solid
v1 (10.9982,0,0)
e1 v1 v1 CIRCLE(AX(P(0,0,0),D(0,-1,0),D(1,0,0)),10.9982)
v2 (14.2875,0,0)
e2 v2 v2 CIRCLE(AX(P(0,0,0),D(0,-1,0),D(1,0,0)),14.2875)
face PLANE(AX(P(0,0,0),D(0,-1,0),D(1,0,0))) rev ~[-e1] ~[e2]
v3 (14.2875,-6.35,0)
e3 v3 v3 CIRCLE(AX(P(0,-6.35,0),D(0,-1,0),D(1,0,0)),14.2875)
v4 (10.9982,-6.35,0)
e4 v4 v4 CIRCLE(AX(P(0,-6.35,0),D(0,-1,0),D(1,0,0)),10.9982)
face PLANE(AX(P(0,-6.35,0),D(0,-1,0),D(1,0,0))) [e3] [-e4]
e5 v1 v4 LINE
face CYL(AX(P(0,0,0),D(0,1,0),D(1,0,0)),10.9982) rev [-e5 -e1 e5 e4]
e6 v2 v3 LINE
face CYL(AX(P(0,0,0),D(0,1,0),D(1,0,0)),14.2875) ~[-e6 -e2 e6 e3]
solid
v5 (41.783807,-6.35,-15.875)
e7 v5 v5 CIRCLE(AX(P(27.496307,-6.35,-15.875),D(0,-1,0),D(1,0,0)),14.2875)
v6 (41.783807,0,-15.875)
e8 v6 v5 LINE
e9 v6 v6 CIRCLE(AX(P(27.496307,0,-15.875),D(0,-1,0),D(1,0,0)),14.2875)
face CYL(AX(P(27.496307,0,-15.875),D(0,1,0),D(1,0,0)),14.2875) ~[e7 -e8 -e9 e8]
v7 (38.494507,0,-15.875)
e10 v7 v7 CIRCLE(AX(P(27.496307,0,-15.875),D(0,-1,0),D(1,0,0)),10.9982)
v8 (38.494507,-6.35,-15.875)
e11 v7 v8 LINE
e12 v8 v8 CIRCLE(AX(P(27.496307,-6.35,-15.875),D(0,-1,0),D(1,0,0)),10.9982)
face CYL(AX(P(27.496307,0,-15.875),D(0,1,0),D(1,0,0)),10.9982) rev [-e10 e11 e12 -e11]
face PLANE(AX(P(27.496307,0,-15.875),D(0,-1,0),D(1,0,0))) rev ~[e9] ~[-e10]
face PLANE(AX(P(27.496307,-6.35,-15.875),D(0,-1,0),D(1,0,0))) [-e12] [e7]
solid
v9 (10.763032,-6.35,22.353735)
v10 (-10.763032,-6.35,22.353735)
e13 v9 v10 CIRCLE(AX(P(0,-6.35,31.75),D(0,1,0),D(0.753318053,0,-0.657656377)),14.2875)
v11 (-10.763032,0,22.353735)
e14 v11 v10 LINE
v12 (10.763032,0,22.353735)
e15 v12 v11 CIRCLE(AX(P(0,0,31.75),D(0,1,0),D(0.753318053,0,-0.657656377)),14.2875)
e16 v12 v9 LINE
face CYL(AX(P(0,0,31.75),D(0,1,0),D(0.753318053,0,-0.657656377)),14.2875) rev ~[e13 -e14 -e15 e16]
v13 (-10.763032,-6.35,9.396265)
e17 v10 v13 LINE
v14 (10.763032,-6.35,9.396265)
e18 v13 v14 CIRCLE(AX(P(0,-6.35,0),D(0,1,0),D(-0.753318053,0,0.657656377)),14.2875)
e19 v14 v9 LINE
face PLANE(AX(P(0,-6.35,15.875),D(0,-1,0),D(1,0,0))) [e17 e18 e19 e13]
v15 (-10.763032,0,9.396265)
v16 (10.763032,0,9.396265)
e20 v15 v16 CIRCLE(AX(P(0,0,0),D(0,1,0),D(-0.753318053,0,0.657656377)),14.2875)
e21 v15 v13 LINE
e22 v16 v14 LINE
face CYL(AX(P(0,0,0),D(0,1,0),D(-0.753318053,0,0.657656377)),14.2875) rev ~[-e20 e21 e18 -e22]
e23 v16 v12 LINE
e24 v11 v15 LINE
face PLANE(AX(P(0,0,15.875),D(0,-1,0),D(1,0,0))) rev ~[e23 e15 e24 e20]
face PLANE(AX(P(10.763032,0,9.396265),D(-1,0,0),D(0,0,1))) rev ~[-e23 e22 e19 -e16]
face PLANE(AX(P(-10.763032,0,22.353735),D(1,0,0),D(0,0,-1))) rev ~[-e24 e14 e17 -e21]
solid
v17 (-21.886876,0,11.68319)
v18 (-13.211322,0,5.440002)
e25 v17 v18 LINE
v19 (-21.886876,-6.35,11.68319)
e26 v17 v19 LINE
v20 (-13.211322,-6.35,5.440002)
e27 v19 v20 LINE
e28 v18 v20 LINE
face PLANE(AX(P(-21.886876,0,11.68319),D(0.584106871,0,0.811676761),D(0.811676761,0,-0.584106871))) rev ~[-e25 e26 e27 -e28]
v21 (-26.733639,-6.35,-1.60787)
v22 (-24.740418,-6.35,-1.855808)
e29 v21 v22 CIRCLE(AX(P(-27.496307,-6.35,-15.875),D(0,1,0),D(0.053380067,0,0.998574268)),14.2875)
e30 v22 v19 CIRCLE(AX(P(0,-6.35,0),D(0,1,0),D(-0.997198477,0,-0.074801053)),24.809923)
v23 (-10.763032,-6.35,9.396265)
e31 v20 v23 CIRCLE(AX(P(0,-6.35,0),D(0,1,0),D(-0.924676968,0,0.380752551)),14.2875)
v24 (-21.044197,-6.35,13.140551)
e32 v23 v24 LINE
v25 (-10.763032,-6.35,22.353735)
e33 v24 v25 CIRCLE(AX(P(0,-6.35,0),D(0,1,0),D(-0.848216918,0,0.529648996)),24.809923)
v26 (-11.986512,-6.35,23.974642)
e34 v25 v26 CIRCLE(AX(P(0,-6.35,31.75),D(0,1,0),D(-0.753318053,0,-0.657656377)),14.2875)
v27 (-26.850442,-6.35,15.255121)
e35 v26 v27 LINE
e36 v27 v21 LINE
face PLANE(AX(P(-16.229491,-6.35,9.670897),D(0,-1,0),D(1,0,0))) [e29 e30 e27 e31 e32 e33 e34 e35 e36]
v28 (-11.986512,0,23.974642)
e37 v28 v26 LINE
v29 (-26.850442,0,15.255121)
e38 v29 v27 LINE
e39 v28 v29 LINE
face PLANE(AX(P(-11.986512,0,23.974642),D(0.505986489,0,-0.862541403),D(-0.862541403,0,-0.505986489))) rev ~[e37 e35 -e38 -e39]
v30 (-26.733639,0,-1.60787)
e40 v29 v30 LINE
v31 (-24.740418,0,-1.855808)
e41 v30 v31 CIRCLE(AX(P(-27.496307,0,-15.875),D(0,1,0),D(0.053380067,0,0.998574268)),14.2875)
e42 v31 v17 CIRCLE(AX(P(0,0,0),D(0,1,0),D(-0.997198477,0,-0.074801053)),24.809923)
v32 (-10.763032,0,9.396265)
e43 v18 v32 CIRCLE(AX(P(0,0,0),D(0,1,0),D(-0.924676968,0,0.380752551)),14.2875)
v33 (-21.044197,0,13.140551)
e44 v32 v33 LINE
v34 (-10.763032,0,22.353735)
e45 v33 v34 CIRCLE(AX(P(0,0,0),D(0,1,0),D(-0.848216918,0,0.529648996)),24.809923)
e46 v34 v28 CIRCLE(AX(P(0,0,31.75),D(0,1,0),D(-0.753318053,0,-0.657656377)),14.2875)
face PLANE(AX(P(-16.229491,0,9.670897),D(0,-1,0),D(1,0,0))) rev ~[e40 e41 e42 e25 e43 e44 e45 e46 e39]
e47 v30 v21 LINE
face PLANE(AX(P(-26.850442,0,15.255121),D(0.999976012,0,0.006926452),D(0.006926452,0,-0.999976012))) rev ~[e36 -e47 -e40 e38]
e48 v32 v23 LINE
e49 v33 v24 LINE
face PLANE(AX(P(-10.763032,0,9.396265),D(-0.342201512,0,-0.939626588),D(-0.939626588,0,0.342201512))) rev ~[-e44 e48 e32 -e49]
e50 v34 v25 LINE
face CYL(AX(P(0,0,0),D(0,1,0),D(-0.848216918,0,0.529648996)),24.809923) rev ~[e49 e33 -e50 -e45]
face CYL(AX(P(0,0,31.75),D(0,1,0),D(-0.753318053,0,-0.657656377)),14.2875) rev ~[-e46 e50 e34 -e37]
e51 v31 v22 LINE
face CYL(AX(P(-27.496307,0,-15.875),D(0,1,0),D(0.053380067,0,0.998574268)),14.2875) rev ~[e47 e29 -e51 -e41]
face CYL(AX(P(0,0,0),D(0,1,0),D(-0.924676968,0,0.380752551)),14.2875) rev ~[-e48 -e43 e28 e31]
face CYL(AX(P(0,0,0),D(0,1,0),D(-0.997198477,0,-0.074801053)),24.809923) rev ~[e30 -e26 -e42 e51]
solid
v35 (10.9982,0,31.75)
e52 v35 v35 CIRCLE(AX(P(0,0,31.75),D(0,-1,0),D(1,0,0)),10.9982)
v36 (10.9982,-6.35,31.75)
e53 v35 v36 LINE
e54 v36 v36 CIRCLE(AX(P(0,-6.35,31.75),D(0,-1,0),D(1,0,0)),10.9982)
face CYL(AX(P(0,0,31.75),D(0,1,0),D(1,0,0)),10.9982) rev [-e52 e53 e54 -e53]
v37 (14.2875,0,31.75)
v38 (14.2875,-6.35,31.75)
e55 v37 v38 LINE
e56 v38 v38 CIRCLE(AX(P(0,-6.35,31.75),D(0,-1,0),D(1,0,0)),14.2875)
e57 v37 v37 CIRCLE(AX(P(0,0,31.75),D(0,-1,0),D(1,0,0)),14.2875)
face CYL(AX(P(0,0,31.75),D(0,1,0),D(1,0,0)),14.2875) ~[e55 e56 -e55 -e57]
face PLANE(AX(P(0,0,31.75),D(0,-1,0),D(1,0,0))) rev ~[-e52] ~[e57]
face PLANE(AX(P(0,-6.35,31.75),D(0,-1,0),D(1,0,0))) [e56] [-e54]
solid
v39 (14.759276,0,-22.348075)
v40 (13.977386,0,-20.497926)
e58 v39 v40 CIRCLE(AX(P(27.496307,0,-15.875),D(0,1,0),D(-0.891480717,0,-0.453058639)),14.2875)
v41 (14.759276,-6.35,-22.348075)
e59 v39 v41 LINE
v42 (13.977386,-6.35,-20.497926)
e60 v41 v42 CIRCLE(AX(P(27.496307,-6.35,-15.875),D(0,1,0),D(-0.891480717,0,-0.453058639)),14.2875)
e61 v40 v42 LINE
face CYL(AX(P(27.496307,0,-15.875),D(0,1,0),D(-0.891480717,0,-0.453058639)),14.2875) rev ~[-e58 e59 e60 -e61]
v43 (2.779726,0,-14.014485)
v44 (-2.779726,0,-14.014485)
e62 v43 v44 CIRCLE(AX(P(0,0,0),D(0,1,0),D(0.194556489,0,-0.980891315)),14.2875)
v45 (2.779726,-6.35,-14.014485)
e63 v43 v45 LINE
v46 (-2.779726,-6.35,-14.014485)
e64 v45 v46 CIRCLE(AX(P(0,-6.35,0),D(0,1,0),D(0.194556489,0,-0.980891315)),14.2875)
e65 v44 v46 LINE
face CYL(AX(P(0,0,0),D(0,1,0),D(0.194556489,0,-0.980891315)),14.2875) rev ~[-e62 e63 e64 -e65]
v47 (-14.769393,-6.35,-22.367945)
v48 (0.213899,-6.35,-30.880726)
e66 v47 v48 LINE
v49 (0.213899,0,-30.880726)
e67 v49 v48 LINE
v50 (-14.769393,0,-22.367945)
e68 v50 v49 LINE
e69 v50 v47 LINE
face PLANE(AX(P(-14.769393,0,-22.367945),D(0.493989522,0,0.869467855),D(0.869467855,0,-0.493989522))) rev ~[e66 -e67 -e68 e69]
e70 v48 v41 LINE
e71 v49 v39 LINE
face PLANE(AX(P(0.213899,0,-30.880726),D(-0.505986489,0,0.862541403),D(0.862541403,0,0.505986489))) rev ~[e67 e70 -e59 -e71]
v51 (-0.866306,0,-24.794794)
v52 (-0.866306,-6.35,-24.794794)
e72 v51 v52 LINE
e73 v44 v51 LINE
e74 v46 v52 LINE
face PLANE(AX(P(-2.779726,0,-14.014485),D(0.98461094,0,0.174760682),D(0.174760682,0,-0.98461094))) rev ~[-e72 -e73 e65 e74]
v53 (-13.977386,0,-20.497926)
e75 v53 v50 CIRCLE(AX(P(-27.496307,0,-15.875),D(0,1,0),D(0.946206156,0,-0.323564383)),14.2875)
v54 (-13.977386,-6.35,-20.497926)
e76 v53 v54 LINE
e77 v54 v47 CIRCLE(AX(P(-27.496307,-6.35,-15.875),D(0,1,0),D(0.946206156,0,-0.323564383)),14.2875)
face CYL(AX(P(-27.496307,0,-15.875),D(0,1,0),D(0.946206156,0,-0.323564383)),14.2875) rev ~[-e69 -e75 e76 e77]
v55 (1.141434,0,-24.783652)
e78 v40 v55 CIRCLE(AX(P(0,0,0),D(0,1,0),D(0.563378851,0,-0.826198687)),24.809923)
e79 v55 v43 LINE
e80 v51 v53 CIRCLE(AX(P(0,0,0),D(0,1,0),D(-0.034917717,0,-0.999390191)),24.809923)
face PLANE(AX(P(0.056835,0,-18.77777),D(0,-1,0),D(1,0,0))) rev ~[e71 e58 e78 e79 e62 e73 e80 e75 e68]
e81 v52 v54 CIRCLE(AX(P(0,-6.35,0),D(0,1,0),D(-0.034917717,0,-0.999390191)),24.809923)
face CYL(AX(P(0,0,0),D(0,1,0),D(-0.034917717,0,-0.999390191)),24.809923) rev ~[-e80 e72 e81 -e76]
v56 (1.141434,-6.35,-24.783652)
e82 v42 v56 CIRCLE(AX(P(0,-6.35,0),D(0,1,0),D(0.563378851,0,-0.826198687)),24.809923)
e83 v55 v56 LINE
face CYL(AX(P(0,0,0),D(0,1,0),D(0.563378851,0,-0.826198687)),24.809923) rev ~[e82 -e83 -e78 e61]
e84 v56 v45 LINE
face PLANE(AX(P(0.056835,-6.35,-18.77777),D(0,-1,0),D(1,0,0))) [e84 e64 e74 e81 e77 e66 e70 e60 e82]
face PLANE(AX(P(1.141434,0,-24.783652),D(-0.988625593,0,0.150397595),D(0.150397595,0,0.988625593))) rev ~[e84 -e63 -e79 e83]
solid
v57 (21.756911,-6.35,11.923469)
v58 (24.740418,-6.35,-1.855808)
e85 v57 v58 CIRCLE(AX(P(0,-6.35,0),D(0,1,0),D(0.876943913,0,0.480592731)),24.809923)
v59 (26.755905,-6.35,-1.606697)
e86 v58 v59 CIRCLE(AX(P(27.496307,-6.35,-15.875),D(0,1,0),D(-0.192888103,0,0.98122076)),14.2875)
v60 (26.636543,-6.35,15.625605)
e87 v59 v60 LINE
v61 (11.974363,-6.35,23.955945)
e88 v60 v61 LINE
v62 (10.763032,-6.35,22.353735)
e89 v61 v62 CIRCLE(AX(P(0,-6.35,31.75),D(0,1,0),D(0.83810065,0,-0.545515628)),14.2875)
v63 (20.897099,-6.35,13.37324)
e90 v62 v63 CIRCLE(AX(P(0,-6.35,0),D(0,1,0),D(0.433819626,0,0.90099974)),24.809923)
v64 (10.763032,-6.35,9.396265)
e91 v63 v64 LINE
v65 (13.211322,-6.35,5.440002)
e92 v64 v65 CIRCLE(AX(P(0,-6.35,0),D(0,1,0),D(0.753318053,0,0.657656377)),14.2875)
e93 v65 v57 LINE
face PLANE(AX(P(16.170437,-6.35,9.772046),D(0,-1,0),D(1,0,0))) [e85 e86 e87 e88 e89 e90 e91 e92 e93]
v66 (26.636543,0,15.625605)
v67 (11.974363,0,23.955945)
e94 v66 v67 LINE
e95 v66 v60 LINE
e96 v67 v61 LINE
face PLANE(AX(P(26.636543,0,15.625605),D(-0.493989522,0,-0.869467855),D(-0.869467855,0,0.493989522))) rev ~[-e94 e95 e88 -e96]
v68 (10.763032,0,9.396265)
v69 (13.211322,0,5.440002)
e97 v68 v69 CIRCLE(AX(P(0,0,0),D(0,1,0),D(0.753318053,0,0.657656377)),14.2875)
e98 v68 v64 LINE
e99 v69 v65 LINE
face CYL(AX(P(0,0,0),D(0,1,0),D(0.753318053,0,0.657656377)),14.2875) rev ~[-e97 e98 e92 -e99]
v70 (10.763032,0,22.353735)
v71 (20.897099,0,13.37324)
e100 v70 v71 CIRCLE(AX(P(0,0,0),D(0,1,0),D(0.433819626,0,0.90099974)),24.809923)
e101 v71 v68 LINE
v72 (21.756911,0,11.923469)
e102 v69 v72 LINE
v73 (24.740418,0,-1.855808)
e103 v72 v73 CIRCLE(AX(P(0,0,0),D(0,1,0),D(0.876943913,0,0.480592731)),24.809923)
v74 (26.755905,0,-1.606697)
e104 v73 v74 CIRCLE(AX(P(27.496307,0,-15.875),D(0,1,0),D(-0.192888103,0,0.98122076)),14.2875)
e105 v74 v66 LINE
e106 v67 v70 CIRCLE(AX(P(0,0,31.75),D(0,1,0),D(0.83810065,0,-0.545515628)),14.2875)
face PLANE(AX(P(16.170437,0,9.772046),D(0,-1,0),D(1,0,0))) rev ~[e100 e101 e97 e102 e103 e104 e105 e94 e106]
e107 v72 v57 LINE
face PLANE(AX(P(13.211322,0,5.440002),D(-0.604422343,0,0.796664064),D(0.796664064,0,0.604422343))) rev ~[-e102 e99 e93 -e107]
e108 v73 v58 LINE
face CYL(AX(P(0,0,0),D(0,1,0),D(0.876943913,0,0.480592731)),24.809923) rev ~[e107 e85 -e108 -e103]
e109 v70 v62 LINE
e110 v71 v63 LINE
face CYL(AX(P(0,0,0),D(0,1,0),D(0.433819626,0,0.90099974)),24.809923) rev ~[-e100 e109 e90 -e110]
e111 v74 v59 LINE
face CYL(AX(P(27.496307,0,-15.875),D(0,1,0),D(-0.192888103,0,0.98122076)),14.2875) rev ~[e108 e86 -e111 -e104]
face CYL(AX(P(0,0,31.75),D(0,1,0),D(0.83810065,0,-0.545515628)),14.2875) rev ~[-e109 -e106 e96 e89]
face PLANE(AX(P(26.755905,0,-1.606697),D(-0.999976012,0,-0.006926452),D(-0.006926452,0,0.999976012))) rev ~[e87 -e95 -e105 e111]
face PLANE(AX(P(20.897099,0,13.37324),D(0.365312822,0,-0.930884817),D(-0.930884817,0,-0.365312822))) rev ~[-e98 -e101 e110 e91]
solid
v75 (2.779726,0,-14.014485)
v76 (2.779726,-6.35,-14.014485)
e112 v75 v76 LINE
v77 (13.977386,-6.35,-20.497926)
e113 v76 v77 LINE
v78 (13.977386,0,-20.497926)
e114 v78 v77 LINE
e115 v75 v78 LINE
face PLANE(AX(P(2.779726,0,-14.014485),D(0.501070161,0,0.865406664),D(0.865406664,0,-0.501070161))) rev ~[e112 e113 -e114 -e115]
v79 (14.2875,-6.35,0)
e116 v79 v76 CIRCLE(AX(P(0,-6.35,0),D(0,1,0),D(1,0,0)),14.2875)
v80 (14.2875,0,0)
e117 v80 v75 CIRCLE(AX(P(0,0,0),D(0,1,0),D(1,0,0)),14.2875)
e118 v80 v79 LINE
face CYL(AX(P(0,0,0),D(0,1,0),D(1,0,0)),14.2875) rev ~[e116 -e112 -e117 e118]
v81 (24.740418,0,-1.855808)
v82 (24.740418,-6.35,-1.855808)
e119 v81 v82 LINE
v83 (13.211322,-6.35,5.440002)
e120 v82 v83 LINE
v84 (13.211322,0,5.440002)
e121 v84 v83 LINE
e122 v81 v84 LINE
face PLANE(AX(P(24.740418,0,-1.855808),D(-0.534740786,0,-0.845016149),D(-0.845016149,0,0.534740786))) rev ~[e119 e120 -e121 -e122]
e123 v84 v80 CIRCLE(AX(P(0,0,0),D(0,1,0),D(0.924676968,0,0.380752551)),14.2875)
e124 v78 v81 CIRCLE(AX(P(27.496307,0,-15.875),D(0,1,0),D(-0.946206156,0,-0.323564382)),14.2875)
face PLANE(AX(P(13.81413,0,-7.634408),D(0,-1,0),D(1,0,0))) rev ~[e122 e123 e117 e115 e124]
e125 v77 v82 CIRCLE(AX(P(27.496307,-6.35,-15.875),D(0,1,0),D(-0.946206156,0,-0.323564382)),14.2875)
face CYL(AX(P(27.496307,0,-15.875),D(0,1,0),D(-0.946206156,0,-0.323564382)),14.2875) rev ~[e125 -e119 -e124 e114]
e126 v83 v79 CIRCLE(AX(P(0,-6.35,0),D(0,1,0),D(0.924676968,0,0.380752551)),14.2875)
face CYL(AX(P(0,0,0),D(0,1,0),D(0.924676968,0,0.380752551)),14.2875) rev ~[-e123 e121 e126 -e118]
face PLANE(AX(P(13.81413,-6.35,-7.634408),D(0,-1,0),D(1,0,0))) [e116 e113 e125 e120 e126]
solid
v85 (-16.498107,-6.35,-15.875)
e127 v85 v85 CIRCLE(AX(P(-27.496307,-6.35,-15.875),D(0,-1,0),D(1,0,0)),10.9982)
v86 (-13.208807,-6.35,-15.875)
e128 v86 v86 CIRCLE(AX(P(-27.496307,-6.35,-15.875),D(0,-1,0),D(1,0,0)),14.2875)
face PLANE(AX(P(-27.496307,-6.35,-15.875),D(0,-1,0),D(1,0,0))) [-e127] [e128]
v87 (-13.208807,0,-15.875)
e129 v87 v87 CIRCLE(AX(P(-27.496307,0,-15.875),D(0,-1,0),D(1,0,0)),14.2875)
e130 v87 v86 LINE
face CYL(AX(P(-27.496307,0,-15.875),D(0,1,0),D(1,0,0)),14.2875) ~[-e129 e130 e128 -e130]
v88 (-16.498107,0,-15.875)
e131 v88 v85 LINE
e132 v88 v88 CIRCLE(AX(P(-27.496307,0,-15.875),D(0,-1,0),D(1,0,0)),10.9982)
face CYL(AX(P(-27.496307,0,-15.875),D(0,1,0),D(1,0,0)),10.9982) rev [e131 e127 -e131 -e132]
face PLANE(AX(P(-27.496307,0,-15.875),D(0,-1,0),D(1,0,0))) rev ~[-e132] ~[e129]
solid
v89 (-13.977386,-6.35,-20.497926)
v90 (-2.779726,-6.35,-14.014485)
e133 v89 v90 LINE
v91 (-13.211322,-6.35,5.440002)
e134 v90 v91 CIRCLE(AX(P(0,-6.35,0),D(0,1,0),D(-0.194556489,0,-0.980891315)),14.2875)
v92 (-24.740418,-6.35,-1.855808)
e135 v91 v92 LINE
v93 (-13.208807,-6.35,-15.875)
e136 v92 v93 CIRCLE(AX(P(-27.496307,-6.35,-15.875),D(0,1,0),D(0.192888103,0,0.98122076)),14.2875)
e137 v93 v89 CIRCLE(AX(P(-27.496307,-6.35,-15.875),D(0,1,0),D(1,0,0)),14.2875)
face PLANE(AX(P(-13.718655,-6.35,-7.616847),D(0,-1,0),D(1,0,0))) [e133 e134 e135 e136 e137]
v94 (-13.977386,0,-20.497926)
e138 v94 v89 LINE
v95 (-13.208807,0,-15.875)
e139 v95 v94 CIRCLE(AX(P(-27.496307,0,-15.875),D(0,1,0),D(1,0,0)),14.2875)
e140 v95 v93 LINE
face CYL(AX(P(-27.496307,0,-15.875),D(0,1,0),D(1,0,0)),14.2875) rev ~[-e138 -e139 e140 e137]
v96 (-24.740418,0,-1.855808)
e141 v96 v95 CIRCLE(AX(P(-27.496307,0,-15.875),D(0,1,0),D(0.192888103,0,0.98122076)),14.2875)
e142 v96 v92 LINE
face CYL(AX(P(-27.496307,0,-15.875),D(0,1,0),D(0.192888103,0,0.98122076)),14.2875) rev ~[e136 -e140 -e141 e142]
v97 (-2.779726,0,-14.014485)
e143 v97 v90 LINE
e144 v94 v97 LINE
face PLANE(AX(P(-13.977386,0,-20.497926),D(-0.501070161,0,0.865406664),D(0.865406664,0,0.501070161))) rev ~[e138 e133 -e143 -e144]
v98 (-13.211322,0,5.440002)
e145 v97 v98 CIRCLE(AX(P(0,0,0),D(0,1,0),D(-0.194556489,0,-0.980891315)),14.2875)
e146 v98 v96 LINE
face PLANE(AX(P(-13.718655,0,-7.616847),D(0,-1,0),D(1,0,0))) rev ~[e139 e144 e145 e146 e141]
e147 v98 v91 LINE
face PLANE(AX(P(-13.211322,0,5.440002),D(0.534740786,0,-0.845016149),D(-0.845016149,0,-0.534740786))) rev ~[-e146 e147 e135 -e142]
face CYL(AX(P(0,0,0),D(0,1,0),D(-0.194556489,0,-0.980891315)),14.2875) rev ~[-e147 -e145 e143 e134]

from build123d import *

# Parameters (mm, degrees)
F0_R     = 14.2875
F0_R_2   = 10.9982
F2_DEPTH = 6.35


with BuildPart() as f2:
    # F0 (on Front) → F2 (new body)
    with BuildSketch(Plane.XZ):
        with Locations((27.4963065702, -15.875)):
            Circle(F0_R)
        with Locations((27.4963065702, -15.875)):
            Circle(F0_R_2, mode=Mode.SUBTRACT)
    extrude(amount=F2_DEPTH)


with BuildPart() as f2b:
    # F0 (on Front) → F2, piece 2 (new body)
    with BuildSketch(Plane.XZ):
        Circle(F0_R)
        Circle(F0_R_2, mode=Mode.SUBTRACT)
    extrude(amount=F2_DEPTH)


with BuildPart() as f2c:
    # F0 (on Front) → F2, piece 3 (new body)
    with BuildSketch(Plane.XZ):
        with Locations((0, 31.75)):
            Circle(F0_R)
        with Locations((0, 31.75)):
            Circle(F0_R_2, mode=Mode.SUBTRACT)
    extrude(amount=F2_DEPTH)


with BuildPart() as f2d:
    # F0 (on Front) → F2, piece 4 (new body)
    with BuildSketch(Plane.XZ):
        with Locations((-27.4963065702, -15.875)):
            Circle(F0_R)
        with Locations((-27.4963065702, -15.875)):
            Circle(F0_R_2, mode=Mode.SUBTRACT)
    extrude(amount=F2_DEPTH)


with BuildPart() as f2e:
    # F1 (on Front) → F2, piece 5 (new body)
    with BuildSketch(Plane.XZ):
        with BuildLine():
            Line((24.7404177955, -1.8558083931), (13.2113221809, 5.4400020663))
            ThreePointArc((13.2113221809, 5.4400020663), (14.0158735352, 2.7727144272), (14.2875, 0))
            ThreePointArc((14.2875, 0), (11.0419198775, -9.0668992312), (2.7797258382, -14.0144846682))
            Line((2.7797258382, -14.0144846682), (13.9773861107, -20.4979261146))
            ThreePointArc((13.9773861107, -20.4979261146), (15.1229686136, -8.73125), (24.7404177955, -1.8558083931))
        make_face()
    extrude(amount=F2_DEPTH)


with BuildPart() as f2f:
    # F1 (on Front) → F2, piece 6 (new body)
    with BuildSketch(Plane.XZ):
        with BuildLine():
            ThreePointArc((10.7630316848, 22.3537345077), (0, 17.4625), (-10.7630316848, 22.3537345077))
            Line((-10.7630316848, 22.3537345077), (-10.7630316848, 9.3962654923))
            ThreePointArc((-10.7630316848, 9.3962654923), (0, 14.2875), (10.7630316848, 9.3962654923))
            Line((10.7630316848, 9.3962654923), (10.7630316848, 22.3537345077))
        make_face()
    extrude(amount=F2_DEPTH)


with BuildPart() as f2g:
    # F1 (on Front) → F2, piece 7 (new body)
    with BuildSketch(Plane.XZ):
        with BuildLine():
            ThreePointArc((-2.7797258382, -14.0144846682), (-12.5915712964, -6.751665612), (-13.2113221809, 5.4400020663))
            Line((-13.2113221809, 5.4400020663), (-24.7404177955, -1.8558083931))
            ThreePointArc((-24.7404177955, -1.8558083931), (-16.4621002752, -6.7987150942), (-13.2088065702, -15.875))
            ThreePointArc((-13.2088065702, -15.875), (-13.4022611553, -18.2181901529), (-13.9773861107, -20.4979261146))
            Line((-13.9773861107, -20.4979261146), (-2.7797258382, -14.0144846682))
        make_face()
    extrude(amount=F2_DEPTH)


with BuildPart() as f2h:
    # F1 (on Front) → F2, piece 8 (new body)
    with BuildSketch(Plane.XZ):
        with BuildLine():
            ThreePointArc((2.7797258382, -14.0144846682), (0, -14.2875), (-2.7797258382, -14.0144846682))
            Line((-2.7797258382, -14.0144846682), (-0.8663058881, -24.7947940422))
            ThreePointArc((-0.8663058881, -24.7947940422), (0.1376769661, -24.8095413609), (1.141434315, -24.783652378))
            Line((1.141434315, -24.783652378), (2.7797258382, -14.0144846682))
        make_face()
        with BuildLine():
            ThreePointArc((-13.9773861107, -20.4979261146), (-14.3401220421, -21.4470252075), (-14.7693931554, -22.3679447236))
            Line((-14.7693931554, -22.3679447236), (0.2138989984, -30.880725603))
            Line((0.2138989984, -30.880725603), (14.7592758228, -22.3480753118))
            ThreePointArc((14.7592758228, -22.3480753118), (14.33577822, -21.4367577971), (13.9773861107, -20.4979261146))
            ThreePointArc((13.9773861107, -20.4979261146), (7.8572606656, -23.5328653657), (1.141434315, -24.783652378))
            ThreePointArc((1.141434315, -24.783652378), (0.1376769661, -24.8095413609), (-0.8663058881, -24.7947940422))
            ThreePointArc((-0.8663058881, -24.7947940422), (-7.7265494586, -23.5761050844), (-13.9773861107, -20.4979261146))
        make_face()
    extrude(amount=F2_DEPTH)


with BuildPart() as f2i:
    # F1 (on Front) → F2, piece 9 (new body)
    with BuildSketch(Plane.XZ):
        with BuildLine():
            ThreePointArc((21.7569112787, 11.9234688367), (21.3393208303, 12.6556581808), (20.8970993022, 13.3732396315))
            Line((20.8970993022, 13.3732396315), (10.7630316848, 9.3962654923))
            ThreePointArc((10.7630316848, 9.3962654923), (12.14929693, 7.5184599724), (13.2113221809, 5.4400020663))
            Line((13.2113221809, 5.4400020663), (21.7569112787, 11.9234688367))
        make_face()
        with BuildLine():
            Line((26.6365433603, 15.6256047679), (11.9743630343, 23.9559454599))
            ThreePointArc((11.9743630343, 23.9559454599), (11.3968877171, 23.1335270201), (10.7630316848, 22.3537345077))
            ThreePointArc((10.7630316848, 22.3537345077), (16.454582814, 18.5682255992), (20.8970993022, 13.3732396315))
            ThreePointArc((20.8970993022, 13.3732396315), (21.3393208303, 12.6556581808), (21.7569112787, 11.9234688367))
            ThreePointArc((21.7569112787, 11.9234688367), (24.2480416323, 5.2502166132), (24.7404177955, -1.8558083931))
            ThreePointArc((24.7404177955, -1.8558083931), (25.7437296863, -1.6953973781), (26.7559049388, -1.6066973093))
            Line((26.7559049388, -1.6066973093), (26.6365433603, 15.6256047679))
        make_face()
    extrude(amount=F2_DEPTH)


with BuildPart() as f2j:
    # F1 (on Front) → F2, piece 10 (new body)
    with BuildSketch(Plane.XZ):
        with BuildLine():
            Line((-10.7630316848, 9.3962654923), (-21.0441967437, 13.140551012))
            ThreePointArc((-21.0441967437, 13.140551012), (-21.4779011139, 12.4190201396), (-21.8868764431, 11.6831903628))
            Line((-21.8868764431, 11.6831903628), (-13.2113221809, 5.4400020663))
            ThreePointArc((-13.2113221809, 5.4400020663), (-12.14929693, 7.5184599724), (-10.7630316848, 9.3962654923))
        make_face()
        with BuildLine():
            ThreePointArc((-10.7630316848, 22.3537345077), (-11.4036076442, 23.1424225855), (-11.9865117834, 23.9746420329))
            Line((-11.9865117834, 23.9746420329), (-26.8504423587, 15.255120835))
            Line((-26.8504423587, 15.255120835), (-26.7336388571, -1.6078701482))
            ThreePointArc((-26.7336388571, -1.6078701482), (-25.7326659371, -1.6967692229), (-24.7404177955, -1.8558083931))
            ThreePointArc((-24.7404177955, -1.8558083931), (-24.2765785034, 5.1166428112), (-21.8868764431, 11.6831903628))
            ThreePointArc((-21.8868764431, 11.6831903628), (-21.4779011139, 12.4190201396), (-21.0441967437, 13.140551012))
            ThreePointArc((-21.0441967437, 13.140551012), (-16.5573437666, 18.476651885), (-10.7630316848, 22.3537345077))
        make_face()
    extrude(amount=F2_DEPTH)


solid = Compound([f2.part, f2b.part, f2c.part, f2d.part, f2e.part, f2f.part, f2g.part, f2h.part, f2i.part, f2j.part])
